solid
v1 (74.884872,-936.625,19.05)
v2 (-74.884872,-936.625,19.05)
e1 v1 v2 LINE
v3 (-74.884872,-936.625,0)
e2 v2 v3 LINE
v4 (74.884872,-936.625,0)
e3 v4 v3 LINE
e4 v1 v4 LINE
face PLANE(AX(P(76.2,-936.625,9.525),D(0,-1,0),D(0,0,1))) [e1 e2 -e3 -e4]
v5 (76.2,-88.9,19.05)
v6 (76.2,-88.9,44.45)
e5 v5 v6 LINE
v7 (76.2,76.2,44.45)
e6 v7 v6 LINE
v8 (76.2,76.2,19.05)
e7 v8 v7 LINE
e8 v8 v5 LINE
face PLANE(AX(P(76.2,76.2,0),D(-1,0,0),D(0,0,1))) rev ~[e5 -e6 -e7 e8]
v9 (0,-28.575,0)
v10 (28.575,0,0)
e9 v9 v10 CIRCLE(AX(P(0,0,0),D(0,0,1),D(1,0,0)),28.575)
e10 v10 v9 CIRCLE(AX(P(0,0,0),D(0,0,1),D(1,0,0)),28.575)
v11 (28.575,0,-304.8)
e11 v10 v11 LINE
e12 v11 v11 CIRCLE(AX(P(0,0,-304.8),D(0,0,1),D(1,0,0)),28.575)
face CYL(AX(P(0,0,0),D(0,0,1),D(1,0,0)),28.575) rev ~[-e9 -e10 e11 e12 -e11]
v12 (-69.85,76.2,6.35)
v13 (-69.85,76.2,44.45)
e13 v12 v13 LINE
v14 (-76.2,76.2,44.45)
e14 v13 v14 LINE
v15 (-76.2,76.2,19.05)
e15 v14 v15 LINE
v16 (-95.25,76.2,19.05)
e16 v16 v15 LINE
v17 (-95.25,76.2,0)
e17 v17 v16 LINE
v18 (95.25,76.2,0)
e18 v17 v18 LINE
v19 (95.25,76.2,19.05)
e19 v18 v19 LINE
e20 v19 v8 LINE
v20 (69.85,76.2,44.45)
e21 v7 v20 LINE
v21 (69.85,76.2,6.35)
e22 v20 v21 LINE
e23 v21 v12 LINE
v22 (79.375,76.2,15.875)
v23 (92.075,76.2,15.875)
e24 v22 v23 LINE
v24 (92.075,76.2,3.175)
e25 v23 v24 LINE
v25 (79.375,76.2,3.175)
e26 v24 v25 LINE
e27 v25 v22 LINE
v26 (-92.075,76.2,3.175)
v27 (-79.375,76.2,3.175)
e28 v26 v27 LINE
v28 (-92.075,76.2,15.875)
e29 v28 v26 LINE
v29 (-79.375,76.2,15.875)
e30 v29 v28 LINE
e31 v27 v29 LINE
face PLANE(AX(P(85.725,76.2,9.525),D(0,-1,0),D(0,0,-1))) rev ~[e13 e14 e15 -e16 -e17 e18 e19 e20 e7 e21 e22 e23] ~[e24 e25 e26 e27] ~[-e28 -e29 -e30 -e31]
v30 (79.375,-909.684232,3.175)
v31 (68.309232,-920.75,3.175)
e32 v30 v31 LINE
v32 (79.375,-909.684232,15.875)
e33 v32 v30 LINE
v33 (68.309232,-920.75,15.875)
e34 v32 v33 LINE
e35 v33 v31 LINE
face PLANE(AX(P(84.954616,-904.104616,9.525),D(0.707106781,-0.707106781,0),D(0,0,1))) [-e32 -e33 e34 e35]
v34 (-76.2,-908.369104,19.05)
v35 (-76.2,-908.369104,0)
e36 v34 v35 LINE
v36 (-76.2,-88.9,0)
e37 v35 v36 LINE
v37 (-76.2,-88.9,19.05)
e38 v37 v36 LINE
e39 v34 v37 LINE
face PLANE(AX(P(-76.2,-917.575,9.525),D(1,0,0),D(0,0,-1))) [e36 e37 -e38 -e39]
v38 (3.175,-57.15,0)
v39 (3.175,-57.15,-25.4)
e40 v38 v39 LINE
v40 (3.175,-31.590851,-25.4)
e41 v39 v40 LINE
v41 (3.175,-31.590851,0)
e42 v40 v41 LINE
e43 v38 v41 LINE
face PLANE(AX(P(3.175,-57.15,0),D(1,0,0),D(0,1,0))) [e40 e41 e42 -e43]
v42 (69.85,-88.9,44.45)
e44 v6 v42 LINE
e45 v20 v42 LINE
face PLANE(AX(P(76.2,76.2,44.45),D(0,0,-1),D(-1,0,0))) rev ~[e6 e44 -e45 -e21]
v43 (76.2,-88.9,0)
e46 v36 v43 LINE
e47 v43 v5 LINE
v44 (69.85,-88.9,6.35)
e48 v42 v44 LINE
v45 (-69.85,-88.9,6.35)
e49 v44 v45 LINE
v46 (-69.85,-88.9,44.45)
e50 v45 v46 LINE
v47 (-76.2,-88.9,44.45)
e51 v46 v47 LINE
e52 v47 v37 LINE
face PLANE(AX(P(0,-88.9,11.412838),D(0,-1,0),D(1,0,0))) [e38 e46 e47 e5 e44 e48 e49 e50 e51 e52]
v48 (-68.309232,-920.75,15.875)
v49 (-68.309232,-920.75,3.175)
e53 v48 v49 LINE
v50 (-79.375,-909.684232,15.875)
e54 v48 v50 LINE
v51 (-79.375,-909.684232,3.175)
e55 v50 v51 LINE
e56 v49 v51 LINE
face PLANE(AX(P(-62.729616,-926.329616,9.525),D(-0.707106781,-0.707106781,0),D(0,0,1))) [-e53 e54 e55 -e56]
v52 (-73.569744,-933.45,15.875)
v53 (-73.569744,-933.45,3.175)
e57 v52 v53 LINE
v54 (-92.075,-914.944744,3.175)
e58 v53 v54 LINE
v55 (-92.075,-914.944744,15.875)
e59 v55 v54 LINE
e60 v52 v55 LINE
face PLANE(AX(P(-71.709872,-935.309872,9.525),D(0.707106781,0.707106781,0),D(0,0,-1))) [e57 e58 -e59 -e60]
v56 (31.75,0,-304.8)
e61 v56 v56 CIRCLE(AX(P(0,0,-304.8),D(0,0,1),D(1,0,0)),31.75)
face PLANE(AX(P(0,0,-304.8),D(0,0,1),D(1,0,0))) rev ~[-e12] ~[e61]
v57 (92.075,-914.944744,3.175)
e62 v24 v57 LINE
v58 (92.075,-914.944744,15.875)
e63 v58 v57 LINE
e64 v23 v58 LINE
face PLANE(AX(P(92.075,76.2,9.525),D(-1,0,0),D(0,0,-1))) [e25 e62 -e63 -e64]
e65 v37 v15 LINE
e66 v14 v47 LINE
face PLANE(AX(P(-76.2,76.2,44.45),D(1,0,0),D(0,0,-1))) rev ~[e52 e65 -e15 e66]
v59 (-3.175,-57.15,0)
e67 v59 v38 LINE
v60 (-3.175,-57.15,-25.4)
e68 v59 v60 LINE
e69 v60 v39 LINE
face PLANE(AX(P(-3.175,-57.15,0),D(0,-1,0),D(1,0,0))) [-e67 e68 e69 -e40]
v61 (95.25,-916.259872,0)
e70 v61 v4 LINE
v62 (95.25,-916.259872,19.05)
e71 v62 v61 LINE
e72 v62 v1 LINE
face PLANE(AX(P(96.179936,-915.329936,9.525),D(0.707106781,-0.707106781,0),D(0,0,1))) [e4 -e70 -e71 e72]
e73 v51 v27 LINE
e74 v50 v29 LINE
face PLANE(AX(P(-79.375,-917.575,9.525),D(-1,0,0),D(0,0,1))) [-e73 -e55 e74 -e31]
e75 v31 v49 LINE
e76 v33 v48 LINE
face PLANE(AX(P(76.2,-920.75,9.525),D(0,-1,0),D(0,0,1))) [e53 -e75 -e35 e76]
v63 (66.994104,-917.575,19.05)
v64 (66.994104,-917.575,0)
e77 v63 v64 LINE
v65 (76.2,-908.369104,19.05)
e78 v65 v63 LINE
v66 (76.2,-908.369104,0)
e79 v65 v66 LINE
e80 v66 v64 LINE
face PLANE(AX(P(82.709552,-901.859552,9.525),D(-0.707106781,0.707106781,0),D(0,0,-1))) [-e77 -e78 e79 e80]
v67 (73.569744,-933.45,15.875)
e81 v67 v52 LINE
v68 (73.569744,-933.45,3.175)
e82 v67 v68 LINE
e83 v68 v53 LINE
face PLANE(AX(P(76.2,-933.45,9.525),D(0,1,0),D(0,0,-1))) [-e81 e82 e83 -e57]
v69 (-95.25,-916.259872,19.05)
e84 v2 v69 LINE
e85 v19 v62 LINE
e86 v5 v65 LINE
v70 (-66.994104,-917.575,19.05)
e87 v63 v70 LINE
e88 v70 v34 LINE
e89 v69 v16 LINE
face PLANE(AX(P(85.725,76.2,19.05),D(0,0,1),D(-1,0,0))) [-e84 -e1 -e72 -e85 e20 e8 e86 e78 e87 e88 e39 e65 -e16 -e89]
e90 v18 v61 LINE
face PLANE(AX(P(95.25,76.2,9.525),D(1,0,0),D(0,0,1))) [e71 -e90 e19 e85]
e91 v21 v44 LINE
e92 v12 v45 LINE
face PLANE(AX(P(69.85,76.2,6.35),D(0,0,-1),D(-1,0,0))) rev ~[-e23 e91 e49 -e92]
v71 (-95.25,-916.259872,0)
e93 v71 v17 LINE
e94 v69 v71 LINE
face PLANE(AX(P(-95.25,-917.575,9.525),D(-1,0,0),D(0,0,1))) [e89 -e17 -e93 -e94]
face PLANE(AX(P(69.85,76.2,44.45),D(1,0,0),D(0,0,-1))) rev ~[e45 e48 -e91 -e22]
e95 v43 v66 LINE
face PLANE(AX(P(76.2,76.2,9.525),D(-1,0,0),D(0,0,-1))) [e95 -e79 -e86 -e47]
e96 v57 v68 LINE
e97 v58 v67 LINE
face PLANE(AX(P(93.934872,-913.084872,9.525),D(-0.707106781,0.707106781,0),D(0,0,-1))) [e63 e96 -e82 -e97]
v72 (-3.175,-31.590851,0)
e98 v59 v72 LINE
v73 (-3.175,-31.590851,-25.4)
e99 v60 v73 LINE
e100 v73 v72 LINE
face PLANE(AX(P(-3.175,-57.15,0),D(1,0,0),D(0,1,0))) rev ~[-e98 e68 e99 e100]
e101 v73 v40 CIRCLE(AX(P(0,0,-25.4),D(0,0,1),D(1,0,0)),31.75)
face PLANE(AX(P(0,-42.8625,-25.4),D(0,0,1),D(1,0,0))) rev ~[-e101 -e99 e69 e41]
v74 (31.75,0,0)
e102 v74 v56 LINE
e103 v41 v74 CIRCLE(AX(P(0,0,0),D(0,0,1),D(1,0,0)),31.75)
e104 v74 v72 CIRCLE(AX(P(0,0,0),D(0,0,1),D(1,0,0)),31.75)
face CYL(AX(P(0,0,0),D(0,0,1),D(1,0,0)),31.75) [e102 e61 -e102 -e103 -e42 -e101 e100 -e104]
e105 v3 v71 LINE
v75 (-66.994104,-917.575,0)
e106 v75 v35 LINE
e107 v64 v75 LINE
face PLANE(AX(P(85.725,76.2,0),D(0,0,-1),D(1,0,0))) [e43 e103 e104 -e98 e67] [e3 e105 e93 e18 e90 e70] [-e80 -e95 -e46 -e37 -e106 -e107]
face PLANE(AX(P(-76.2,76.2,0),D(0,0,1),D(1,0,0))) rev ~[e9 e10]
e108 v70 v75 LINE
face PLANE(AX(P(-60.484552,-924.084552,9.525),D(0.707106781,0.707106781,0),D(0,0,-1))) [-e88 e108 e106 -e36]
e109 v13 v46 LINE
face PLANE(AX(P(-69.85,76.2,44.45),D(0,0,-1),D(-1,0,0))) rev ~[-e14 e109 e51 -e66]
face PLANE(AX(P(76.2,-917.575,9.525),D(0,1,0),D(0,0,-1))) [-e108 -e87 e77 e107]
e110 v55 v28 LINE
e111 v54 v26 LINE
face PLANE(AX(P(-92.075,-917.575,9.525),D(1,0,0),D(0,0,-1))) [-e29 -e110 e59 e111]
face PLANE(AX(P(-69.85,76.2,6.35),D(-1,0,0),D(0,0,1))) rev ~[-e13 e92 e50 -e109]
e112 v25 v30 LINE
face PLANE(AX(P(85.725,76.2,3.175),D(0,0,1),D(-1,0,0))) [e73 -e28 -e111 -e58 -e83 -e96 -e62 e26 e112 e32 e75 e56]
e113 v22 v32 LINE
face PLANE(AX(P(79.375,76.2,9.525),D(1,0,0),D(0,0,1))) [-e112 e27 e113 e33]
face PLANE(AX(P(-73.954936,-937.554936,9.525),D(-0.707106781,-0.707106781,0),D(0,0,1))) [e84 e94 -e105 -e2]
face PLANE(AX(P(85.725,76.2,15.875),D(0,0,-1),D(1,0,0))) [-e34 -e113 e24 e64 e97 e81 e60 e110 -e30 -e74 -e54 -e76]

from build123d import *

# Parameters (mm, degrees)
F0_R     = 31.75
F0_R_2   = 28.575
F1_DEPTH = 304.8
F2_W     = 6.35
F2_H     = 28.575
F3_DEPTH = 25.4
F6_DEPTH = 165.1
F7_W     = 19.05
F7_H     = 19.05
F7_W_2   = 12.7
F7_H_2   = 12.7


# Not quite as in the source:
# - a feature names something its author has since deleted; it is built from what else it names


with BuildPart() as f1:
    # F0 (on Top) → F1 (new body)
    with BuildSketch(Plane.XY):
        Circle(F0_R)
        Circle(F0_R_2, mode=Mode.SUBTRACT)
    extrude(amount=-F1_DEPTH)

    # F2 (on Top) → F3 (join)
    with BuildSketch(Plane.XY):
        with Locations((0, -42.8625)):
            Rectangle(F2_W, F2_H)
    extrude(amount=-F3_DEPTH)

    # F5 (on offset) → F6 (join)
    with BuildSketch(Plane.XZ.offset(-76.2)):
        Polygon((-76.2, 0), (76.2, 0), (76.2, 44.45), (69.85, 44.45), (69.85, 6.35), (-69.85, 6.35), (-69.85, 44.45), (-76.2, 44.45), align=None)
    extrude(amount=F6_DEPTH)

    # F9: sweep along a path in F8
    with BuildLine(Plane.XY.offset(6.35)) as f9_path:
        Line((98.425, 76.2), (98.425, -917.575))
        Line((98.425, -917.575), (76.2, -939.8))
        Line((76.2, -939.8), (-76.2, -939.8))
        Line((-76.2, -939.8), (-98.425, -917.575))
        Line((-98.425, -917.575), (-98.425, 76.2))
    # F7 (on offset) → F9 (sweep)
    with BuildSketch(Plane.XZ.offset(-76.2)):
        with Locations((85.725, 9.525)):
            Rectangle(F7_W, F7_H)
        with Locations((85.725, 9.525)):
            Rectangle(F7_W_2, F7_H_2, mode=Mode.SUBTRACT)
    sweep(path=f9_path.line, transition=Transition.RIGHT)


solid = f1.part
